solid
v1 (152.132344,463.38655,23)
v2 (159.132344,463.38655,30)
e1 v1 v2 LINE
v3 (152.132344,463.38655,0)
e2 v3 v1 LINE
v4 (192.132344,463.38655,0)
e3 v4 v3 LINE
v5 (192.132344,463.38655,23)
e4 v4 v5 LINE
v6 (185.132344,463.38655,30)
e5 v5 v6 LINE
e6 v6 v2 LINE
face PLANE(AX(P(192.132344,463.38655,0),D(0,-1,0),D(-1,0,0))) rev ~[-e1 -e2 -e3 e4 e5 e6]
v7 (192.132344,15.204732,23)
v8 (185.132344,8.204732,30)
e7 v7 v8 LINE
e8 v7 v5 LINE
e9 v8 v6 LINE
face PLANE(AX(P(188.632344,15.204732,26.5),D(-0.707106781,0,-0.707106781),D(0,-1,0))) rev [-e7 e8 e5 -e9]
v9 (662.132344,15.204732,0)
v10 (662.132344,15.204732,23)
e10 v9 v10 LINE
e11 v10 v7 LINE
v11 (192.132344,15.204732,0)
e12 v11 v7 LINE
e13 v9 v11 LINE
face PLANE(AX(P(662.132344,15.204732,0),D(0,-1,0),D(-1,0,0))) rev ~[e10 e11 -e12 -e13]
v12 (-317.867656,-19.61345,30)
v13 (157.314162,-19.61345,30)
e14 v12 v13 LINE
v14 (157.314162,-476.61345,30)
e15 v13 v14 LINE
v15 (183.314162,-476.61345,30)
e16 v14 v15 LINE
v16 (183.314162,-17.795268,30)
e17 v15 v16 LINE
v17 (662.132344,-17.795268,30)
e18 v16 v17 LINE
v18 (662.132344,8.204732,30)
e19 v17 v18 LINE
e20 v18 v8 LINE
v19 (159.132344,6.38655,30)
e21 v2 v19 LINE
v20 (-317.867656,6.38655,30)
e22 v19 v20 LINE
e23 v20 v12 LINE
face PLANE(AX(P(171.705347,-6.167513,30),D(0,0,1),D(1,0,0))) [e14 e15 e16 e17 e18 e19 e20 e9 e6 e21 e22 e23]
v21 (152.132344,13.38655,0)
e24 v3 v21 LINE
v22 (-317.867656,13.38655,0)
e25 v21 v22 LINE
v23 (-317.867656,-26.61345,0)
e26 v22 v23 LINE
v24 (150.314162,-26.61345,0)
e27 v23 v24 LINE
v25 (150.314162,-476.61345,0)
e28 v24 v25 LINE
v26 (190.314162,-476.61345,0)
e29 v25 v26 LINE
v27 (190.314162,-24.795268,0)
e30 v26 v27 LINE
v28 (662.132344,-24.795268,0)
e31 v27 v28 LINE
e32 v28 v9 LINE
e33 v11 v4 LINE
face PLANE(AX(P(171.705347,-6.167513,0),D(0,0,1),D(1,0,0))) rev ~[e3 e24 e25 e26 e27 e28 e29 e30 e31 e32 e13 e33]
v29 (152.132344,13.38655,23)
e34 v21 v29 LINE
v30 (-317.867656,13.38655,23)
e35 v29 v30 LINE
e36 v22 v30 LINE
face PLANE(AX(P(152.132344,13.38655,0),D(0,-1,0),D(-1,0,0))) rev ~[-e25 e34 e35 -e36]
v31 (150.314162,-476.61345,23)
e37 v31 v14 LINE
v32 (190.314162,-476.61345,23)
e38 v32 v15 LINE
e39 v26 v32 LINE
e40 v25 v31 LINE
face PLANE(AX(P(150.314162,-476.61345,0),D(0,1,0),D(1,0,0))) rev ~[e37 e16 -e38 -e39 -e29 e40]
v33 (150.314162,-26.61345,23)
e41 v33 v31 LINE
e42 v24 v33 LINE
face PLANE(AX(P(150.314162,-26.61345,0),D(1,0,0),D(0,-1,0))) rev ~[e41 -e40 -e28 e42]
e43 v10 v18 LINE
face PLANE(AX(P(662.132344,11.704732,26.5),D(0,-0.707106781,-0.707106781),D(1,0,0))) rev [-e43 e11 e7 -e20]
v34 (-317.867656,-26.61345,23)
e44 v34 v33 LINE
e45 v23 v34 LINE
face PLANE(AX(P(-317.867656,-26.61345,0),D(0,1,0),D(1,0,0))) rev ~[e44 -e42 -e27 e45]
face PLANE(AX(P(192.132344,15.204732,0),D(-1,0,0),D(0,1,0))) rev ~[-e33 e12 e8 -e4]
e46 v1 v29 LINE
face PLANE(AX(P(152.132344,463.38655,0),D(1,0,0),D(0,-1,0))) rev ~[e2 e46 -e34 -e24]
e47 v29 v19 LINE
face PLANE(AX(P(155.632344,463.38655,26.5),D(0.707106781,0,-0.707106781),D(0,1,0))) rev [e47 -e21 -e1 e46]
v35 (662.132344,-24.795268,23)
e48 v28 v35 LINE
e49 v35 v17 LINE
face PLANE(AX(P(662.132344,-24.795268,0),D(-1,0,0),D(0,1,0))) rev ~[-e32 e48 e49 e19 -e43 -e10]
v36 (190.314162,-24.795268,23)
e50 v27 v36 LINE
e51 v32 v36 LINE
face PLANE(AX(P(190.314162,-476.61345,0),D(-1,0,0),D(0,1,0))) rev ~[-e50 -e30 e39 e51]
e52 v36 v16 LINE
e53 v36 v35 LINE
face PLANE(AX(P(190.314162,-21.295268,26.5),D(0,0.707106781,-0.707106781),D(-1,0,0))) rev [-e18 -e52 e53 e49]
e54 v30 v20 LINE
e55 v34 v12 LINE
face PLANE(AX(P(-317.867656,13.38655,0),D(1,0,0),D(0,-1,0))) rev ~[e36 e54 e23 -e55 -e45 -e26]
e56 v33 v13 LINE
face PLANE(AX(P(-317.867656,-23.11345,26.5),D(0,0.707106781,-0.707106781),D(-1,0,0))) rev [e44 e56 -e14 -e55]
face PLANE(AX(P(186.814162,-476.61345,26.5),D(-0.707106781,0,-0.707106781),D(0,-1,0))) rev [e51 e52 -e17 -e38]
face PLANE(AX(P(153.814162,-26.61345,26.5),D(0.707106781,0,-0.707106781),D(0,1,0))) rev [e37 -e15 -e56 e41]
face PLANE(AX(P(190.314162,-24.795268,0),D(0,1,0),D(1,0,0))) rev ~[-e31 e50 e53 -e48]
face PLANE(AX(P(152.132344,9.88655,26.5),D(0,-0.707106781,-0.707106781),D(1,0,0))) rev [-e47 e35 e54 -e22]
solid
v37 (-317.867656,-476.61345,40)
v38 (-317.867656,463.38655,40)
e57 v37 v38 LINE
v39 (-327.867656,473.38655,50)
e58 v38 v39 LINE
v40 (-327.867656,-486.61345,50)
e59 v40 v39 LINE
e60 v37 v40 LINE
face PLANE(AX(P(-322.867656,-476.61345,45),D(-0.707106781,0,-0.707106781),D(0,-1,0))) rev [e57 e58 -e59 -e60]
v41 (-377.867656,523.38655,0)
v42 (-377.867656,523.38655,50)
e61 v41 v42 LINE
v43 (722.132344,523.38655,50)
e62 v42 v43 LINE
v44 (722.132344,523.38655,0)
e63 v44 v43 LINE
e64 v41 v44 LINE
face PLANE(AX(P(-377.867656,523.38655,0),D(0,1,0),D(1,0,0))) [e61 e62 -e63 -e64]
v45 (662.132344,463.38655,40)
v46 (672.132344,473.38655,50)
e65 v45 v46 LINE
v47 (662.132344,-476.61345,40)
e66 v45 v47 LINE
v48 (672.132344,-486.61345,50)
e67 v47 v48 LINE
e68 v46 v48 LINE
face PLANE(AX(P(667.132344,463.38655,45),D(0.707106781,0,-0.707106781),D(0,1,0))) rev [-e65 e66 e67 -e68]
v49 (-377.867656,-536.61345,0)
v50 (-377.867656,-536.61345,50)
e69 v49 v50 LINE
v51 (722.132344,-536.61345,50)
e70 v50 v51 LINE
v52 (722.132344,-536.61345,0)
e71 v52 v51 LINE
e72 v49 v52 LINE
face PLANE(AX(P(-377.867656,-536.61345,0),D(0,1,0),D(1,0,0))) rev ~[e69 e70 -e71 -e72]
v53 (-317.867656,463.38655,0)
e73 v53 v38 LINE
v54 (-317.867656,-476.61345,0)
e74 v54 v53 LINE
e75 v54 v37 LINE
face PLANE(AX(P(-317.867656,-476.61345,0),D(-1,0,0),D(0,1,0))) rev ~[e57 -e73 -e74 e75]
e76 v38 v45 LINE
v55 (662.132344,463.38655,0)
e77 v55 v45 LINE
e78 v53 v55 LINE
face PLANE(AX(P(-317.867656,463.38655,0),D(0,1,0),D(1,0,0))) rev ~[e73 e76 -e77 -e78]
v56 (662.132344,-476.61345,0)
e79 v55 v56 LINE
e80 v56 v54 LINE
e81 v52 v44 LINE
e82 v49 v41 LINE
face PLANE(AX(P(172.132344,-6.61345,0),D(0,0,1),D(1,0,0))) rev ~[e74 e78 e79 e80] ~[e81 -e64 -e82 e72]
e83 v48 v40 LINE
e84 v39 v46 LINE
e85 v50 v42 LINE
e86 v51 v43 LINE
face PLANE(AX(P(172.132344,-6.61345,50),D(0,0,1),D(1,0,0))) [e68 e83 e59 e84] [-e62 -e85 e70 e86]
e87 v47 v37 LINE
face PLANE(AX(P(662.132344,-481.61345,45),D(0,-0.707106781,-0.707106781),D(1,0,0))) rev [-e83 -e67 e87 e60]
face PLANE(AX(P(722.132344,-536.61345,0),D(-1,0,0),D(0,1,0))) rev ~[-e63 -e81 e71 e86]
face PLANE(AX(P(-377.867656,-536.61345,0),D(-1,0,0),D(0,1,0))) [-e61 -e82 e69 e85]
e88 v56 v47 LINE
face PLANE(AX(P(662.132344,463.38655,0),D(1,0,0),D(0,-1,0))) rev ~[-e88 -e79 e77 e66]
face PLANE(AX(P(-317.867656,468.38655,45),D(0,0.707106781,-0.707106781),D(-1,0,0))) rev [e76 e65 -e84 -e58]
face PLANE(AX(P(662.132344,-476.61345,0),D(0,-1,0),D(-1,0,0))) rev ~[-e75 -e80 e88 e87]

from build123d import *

# Parameters (mm, degrees)
F0_W     = 1100
F0_H     = 1060
F1_DEPTH = 50
F2_SIZE  = 10
F3_DEPTH = 30
F4_SIZE  = 7


# Not quite as in the source:
# - a feature names something its author has since deleted; it is built from what else it names


with BuildPart() as f1:
    # F0 (on Top) → F1 (new body)
    with BuildSketch(Plane.XY):
        with Locations((172.132343931, -6.6134499709)):
            Rectangle(F0_W, F0_H)
        Polygon((-317.867656069, 13.3865500291), (-317.867656069, 463.3865500291), (152.132343931, 463.3865500291), (192.132343931, 463.3865500291), (662.132343931, 463.3865500291), (662.132343931, 15.2047318473), (662.132343931, -24.7952681527), (662.132343931, -476.6134499709), (190.3141621128, -476.6134499709), (150.3141621128, -476.6134499709), (-317.867656069, -476.6134499709), (-317.867656069, -26.6134499709), align=None, mode=Mode.SUBTRACT)
    extrude(amount=F1_DEPTH)

    # F2
    f2_edges = [f1.edges().sort_by_distance(p)[0] for p in [
        (-317.867656, -6.61345, 50),
        (172.132344, 463.38655, 50),
        (662.132344, -6.61345, 50),
        (172.132344, -476.61345, 50),
    ]]
    chamfer(f2_edges, length=F2_SIZE)


with BuildPart() as f3:
    # F0 (on Top) → F3 (new body)
    with BuildSketch(Plane.XY):
        Polygon((192.132343931, 463.3865500291), (152.132343931, 463.3865500291), (152.132343931, 13.3865500291), (-317.867656069, 13.3865500291), (-317.867656069, -26.6134499709), (150.3141621128, -26.6134499709), (150.3141621128, -476.6134499709), (190.3141621128, -476.6134499709), (190.3141621128, -24.7952681527), (662.132343931, -24.7952681527), (662.132343931, 15.2047318473), (192.132343931, 15.2047318473), align=None)
    extrude(amount=F3_DEPTH)

    # F4
    f4_edges = [f3.edges().sort_by_distance(p)[0] for p in [
        (-83.776747, -26.61345, 30),
        (-82.867656, 13.38655, 30),
        (152.132344, 238.38655, 30),
        (192.132344, 239.295641, 30),
        (426.223253, -24.795268, 30),
        (427.132344, 15.204732, 30),
        (190.314162, -250.704359, 30),
        (150.314162, -251.61345, 30),
    ]]
    chamfer(f4_edges, length=F4_SIZE)


solid = Compound([f1.part, f3.part])
